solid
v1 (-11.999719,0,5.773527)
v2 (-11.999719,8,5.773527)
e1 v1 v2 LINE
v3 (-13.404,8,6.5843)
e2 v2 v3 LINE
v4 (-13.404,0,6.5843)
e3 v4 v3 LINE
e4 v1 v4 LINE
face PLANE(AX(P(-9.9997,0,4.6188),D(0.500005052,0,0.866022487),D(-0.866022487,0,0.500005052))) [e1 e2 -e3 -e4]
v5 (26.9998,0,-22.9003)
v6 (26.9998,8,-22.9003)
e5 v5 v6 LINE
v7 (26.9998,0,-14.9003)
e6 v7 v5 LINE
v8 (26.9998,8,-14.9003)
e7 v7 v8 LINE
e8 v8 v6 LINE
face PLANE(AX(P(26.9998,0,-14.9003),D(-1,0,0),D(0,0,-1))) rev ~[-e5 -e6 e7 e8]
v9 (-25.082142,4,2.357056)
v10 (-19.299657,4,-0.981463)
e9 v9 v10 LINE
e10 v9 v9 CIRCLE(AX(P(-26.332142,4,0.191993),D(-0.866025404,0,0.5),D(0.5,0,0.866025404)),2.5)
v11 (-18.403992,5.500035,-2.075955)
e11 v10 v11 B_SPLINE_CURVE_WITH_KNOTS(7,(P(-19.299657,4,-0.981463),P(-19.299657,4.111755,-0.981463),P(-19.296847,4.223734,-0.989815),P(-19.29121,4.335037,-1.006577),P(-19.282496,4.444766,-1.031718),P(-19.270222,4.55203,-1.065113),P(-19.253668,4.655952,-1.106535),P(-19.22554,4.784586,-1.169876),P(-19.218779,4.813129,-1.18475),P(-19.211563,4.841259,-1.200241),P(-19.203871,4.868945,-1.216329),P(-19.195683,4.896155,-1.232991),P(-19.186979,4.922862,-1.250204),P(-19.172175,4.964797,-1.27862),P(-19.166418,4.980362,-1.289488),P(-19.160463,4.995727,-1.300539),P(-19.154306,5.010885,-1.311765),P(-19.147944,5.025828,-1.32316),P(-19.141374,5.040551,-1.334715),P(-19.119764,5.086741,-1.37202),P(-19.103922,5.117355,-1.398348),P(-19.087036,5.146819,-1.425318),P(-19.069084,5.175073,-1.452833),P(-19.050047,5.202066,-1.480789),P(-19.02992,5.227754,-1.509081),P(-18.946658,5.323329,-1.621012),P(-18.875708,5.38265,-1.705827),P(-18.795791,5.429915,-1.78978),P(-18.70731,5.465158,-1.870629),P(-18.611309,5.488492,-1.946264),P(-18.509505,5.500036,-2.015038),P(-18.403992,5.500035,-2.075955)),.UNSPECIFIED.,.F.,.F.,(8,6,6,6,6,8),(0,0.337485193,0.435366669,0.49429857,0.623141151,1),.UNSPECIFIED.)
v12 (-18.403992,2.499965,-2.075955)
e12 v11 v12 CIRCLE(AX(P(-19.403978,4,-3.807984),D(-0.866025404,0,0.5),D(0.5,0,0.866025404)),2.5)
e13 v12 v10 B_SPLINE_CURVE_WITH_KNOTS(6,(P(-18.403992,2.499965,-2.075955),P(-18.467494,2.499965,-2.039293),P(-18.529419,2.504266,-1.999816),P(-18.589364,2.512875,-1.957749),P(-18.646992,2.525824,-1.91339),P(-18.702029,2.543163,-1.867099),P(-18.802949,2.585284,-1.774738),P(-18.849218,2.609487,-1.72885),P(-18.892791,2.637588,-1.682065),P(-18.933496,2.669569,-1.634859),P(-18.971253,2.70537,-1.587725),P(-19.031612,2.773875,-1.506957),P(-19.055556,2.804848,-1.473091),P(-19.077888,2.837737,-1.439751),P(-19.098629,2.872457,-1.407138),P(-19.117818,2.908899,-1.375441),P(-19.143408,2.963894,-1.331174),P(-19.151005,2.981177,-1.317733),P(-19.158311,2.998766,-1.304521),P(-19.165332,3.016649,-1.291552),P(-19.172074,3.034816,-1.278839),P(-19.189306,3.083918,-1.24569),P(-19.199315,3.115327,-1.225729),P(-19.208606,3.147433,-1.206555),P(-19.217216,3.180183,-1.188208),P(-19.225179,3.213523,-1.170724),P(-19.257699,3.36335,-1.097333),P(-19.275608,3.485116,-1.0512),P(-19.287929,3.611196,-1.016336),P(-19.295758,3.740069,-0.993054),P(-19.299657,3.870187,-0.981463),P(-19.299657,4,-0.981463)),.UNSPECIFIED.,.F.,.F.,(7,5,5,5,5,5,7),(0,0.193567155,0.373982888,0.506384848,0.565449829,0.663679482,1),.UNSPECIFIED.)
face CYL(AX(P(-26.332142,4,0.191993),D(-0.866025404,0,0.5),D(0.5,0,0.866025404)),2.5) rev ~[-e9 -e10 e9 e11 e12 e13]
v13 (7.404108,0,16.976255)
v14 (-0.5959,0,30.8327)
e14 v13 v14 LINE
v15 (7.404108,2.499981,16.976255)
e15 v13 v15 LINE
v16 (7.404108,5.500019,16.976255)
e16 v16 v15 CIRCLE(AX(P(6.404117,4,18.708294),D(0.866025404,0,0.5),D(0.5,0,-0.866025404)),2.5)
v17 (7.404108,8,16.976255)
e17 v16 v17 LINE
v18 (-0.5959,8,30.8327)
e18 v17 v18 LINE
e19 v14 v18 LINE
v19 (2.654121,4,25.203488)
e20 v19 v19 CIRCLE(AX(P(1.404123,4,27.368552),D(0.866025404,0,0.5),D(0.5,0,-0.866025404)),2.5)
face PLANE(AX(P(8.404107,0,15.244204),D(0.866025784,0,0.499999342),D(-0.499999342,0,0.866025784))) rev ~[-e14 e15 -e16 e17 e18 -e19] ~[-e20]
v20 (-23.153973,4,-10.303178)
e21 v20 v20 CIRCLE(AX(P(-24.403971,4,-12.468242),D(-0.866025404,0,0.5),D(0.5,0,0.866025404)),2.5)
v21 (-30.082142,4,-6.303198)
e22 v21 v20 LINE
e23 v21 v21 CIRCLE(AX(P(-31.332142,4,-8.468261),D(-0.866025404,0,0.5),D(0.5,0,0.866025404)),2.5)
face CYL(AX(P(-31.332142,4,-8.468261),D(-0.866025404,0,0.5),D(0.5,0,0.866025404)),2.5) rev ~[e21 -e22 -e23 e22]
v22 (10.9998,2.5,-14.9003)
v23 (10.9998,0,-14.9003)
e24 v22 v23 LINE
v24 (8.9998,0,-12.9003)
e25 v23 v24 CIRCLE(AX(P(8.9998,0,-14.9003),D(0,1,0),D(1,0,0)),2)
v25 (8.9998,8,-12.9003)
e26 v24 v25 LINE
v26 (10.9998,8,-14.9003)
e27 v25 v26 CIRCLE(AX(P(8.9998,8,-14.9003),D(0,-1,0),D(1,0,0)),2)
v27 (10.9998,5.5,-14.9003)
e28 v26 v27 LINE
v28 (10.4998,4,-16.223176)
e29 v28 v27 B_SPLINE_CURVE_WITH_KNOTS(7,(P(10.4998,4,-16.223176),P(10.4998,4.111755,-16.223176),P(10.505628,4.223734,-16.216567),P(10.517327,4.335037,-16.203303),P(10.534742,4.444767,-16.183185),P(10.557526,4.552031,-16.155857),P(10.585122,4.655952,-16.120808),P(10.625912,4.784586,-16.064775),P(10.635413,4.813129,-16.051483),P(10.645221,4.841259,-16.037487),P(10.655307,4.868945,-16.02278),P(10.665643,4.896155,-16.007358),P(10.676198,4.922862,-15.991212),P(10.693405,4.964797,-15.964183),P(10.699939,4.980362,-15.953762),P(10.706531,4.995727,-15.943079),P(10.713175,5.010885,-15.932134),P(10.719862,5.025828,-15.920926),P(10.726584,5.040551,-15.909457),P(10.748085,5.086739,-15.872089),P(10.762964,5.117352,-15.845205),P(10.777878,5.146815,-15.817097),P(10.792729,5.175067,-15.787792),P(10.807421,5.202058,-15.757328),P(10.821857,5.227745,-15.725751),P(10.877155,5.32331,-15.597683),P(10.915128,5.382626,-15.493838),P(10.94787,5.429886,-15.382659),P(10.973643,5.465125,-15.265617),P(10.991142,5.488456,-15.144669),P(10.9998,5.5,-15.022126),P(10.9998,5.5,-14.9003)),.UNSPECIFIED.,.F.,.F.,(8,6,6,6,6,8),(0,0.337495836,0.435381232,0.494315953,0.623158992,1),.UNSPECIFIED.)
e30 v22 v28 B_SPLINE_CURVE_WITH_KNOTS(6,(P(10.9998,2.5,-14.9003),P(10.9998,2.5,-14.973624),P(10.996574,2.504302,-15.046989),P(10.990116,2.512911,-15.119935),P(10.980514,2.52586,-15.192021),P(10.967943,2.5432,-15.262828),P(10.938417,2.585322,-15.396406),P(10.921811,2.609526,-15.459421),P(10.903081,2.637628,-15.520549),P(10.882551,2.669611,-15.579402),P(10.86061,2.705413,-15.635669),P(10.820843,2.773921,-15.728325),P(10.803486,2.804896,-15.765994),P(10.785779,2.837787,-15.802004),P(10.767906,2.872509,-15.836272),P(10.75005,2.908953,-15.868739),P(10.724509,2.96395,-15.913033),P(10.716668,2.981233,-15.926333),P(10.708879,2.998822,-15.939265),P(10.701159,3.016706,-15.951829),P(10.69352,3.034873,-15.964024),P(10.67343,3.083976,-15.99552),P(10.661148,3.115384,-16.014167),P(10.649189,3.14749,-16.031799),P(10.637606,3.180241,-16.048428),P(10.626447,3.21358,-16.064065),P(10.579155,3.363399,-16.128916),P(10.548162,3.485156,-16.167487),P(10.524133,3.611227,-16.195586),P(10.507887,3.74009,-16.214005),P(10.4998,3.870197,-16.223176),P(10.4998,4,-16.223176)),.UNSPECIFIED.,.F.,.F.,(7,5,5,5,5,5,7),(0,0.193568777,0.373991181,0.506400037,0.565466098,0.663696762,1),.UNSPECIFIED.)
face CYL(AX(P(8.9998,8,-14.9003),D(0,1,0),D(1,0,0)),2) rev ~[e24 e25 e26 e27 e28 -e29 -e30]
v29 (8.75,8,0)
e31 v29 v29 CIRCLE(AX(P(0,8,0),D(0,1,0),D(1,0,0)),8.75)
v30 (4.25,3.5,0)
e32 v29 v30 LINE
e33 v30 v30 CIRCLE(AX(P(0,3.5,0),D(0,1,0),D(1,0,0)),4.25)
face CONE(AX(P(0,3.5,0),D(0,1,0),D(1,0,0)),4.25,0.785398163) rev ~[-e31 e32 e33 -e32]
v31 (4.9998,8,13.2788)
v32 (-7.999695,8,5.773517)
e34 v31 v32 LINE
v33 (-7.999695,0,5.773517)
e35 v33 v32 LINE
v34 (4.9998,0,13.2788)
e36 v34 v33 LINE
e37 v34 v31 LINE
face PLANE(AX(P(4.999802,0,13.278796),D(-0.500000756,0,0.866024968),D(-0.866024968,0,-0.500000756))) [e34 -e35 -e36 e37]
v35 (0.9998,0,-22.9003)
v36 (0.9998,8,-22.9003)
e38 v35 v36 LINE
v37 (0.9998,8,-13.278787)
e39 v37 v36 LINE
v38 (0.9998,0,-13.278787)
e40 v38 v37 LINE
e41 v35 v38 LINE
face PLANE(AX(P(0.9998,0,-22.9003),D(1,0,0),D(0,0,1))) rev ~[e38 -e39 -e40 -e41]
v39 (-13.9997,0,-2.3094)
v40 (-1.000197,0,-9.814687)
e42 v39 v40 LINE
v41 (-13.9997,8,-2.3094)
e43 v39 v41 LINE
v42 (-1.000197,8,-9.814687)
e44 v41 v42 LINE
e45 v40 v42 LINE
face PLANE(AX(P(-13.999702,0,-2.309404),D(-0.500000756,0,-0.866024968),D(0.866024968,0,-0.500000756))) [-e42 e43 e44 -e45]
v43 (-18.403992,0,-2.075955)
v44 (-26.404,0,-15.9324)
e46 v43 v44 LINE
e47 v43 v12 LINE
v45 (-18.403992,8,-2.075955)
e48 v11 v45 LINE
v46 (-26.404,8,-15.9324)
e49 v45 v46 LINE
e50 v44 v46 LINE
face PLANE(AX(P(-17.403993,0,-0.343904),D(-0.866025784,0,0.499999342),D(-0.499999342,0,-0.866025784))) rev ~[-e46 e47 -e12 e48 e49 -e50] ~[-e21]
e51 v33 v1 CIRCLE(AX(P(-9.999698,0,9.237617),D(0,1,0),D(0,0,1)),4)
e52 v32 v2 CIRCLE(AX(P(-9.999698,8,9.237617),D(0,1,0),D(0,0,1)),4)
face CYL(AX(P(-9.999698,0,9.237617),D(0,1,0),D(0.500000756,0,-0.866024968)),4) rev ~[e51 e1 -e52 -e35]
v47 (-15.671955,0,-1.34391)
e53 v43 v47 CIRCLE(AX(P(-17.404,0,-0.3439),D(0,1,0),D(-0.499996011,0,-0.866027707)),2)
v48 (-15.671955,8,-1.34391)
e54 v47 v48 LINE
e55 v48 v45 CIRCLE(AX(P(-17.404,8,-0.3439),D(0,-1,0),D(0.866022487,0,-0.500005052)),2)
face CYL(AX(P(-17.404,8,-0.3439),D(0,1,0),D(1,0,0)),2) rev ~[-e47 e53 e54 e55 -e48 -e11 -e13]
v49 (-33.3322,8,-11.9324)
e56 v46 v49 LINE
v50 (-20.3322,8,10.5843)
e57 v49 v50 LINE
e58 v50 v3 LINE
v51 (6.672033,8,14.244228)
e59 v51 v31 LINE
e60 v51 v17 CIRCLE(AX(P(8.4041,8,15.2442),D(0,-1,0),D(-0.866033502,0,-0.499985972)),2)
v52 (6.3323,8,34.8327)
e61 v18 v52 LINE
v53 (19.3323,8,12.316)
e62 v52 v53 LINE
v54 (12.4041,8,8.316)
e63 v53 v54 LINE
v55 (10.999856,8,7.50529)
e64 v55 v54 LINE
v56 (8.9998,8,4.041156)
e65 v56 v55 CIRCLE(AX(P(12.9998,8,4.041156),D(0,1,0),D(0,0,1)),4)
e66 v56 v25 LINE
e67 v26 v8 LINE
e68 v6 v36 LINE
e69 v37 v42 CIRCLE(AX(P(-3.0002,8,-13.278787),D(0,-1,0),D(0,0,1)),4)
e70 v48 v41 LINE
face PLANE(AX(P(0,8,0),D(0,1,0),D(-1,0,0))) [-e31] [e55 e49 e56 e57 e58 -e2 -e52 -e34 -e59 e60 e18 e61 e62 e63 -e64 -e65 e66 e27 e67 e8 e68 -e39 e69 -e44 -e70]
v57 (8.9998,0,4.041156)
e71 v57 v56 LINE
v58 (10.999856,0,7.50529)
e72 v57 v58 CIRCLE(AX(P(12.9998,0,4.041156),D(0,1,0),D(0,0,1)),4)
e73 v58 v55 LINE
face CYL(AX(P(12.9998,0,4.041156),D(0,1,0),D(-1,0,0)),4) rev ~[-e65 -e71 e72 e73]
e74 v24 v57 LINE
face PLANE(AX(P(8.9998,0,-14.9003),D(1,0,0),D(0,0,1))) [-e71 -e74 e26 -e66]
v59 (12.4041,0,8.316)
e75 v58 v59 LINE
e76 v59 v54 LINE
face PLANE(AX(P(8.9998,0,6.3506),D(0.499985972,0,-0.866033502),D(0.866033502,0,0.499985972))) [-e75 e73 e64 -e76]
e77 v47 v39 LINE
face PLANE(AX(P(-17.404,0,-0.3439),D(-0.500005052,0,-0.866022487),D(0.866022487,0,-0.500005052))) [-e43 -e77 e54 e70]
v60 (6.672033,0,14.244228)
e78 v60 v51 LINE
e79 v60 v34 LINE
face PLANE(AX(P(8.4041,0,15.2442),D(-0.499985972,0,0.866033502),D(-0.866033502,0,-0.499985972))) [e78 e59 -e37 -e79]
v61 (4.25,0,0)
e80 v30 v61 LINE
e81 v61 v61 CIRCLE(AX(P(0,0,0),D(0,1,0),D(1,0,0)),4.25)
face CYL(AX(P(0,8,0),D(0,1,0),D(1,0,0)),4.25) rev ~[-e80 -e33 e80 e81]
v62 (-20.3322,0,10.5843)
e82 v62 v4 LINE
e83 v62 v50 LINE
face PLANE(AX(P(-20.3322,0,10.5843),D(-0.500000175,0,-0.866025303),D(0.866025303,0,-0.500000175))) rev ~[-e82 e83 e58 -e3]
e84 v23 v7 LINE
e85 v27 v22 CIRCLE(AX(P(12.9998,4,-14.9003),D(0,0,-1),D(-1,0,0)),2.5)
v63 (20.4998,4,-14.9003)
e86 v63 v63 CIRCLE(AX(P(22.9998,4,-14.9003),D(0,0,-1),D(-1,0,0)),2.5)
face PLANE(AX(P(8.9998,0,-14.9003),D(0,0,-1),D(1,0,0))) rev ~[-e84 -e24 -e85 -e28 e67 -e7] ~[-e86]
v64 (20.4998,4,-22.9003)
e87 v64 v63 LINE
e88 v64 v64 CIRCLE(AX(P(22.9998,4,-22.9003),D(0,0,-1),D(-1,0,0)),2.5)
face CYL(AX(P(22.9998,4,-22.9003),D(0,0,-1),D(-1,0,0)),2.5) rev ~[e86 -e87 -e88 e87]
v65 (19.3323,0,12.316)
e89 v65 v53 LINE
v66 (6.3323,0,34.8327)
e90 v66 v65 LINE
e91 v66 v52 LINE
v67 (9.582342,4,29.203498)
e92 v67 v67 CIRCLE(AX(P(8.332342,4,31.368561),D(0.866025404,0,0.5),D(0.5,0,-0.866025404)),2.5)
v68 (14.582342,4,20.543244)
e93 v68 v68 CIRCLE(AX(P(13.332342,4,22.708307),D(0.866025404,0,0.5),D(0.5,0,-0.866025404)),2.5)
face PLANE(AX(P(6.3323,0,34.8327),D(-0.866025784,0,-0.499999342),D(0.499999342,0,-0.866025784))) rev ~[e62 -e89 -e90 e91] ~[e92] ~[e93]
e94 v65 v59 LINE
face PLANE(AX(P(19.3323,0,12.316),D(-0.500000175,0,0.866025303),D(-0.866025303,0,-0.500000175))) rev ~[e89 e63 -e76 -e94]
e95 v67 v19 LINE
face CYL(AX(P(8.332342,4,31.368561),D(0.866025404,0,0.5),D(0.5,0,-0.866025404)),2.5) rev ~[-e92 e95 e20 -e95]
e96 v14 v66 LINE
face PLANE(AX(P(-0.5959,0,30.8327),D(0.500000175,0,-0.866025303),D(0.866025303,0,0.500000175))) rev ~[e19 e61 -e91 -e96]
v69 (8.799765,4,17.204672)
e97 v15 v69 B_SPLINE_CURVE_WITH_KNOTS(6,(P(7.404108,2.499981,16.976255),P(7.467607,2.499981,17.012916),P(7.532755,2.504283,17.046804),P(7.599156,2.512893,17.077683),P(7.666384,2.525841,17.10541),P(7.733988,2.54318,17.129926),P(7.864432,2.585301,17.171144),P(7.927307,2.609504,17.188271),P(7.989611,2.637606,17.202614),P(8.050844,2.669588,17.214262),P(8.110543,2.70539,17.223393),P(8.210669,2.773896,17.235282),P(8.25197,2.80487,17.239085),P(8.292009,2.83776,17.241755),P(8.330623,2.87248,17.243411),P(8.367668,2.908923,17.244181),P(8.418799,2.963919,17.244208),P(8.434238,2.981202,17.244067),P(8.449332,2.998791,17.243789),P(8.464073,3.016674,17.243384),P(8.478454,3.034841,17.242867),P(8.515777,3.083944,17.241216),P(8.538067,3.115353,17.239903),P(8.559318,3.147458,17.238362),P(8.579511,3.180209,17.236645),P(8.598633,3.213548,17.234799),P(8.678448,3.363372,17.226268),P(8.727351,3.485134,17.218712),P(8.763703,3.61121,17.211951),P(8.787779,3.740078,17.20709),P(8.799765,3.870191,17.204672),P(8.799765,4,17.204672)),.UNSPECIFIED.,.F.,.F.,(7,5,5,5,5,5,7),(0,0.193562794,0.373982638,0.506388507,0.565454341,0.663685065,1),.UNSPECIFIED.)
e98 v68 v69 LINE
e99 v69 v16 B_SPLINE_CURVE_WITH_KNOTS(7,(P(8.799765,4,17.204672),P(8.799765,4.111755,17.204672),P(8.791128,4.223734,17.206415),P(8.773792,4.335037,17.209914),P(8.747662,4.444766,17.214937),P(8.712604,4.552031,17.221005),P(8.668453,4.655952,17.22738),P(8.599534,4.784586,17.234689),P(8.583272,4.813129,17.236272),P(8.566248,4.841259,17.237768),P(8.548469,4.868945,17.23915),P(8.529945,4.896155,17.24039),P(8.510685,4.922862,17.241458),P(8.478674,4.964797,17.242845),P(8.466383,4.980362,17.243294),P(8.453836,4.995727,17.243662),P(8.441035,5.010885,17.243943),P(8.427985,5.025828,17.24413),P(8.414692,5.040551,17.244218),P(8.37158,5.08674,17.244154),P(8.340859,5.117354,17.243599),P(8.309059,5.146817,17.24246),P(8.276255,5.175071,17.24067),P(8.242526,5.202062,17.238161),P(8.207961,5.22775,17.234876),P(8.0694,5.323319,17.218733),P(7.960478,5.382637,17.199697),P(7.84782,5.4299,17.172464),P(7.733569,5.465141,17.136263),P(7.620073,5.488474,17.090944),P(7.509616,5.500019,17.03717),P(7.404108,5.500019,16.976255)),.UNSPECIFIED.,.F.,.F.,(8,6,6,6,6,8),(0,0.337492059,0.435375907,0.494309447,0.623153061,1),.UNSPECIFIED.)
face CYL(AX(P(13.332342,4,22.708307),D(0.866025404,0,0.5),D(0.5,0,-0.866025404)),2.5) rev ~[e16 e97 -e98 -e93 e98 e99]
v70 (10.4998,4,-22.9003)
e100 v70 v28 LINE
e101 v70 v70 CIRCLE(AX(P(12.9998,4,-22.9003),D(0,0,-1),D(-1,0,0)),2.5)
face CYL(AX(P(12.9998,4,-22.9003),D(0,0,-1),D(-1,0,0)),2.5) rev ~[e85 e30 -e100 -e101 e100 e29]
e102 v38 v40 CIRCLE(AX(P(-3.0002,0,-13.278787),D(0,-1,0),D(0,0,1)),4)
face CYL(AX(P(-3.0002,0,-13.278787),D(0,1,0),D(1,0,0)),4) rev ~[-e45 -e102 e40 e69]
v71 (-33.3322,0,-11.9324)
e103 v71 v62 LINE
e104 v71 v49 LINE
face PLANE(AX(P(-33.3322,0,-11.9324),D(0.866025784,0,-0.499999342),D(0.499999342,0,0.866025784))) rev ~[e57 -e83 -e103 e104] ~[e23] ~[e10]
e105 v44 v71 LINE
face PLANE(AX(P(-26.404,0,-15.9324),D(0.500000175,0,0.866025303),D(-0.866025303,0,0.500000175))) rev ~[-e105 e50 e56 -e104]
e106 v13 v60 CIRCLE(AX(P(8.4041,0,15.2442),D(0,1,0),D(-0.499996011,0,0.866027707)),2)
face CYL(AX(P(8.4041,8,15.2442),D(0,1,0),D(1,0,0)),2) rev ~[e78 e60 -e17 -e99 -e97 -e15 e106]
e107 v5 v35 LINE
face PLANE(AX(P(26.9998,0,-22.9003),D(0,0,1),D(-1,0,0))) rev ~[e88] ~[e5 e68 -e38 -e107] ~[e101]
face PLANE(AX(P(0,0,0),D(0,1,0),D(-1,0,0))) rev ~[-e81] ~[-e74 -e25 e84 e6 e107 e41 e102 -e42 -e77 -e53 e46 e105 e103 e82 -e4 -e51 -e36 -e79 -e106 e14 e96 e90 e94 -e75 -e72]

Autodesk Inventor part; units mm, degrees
ref_plane "YZ Plane" through (0, 0, 0) normal (1, 0, 0) x (0, 1, 0)
ref_plane "XZ Plane" through (0, 0, 0) normal (0, 1, 0) x (-1, 0, 0)
ref_plane "XY Plane" through (0, 0, 0) normal (0, 0, 1) x (1, 0, 0)
sketch "Sketch1" plane through (0, 0, 0) normal (0, 1, 0) x (-1, 0, 0)
  line L0 (-0.9998, -14.9003) -> (-26.9998, -14.9003)
  line L1 (-26.9998, -14.9003) -> (-26.9998, -22.9003)
  line L2 (-26.9998, -22.9003) -> (-0.9998, -22.9003)
  line L3 (-0.9998, -22.9003) -> (-0.9998, -14.9003)
  line L4 (-0.9998, -14.9003) -> (-8.9998, -14.9003)
  line L5 (-8.9998, -14.9003) -> (-8.9998, -10.9694)
  line L6 (-8.9998, -10.9694) -> (-0.9998, -10.9694) construction
  line L7 (-0.9998, -10.9694) -> (-0.9998, -14.9003)
  line L8 (13.404, 6.5843) -> (26.404, -15.9324)
  line L9 (26.404, -15.9324) -> (33.3322, -11.9324)
  line L10 (33.3322, -11.9324) -> (20.3322, 10.5843)
  line L11 (20.3322, 10.5843) -> (13.404, 6.5843)
  line L12 (13.404, 6.5843) -> (17.404, -0.3439)
  line L13 (17.404, -0.3439) -> (13.9997, -2.3094)
  line L14 (13.9997, -2.3094) -> (9.9997, 4.6188) construction
  line L15 (9.9997, 4.6188) -> (13.404, 6.5843)
  line L16 (-12.4041, 8.316) -> (0.5959, 30.8327)
  line L17 (0.5959, 30.8327) -> (-6.3323, 34.8327)
  line L18 (-6.3323, 34.8327) -> (-19.3323, 12.316)
  line L19 (-19.3323, 12.316) -> (-12.4041, 8.316)
  line L20 (-12.4041, 8.316) -> (-8.4041, 15.2442)
  line L21 (-8.4041, 15.2442) -> (-4.9998, 13.2788)
  line L22 (-4.9998, 13.2788) -> (-8.9998, 6.3506) construction
  line L23 (-8.9998, 6.3506) -> (-12.4041, 8.316)
  line L24 (17.9997, 0) -> (-8.9998, -15.5882)
  line L25 (-8.9998, -15.5882) -> (-8.9998, 15.5882)
  line L26 (-8.9998, 15.5882) -> (17.9997, 0)
  point P0 (0, 0)
  point P1 (0, 0)
  point P2 (17.404, -0.3439)
  dimension "d0" = 8
  dimension "d3" = 360
  dimension "d5" = 60.332
  dimension "d6" = 57.733
  dimension "d7" = 26
extrude "Extrusion1" add sketch "Sketch1" along normal blind 8
fillet "Fillet1" radius 4 3 edges at (8.9998, 4, 6.3506) (-9.9997, 4, 4.6188) (0.9998, 4, -10.9694)
sketch "Sketch2" plane through (0, 8, 0) normal (0, 1, 0) x (1, 0, 0)
  line L0 (8.9998, -4.0412) -> (8.9998, 14.9003) projected
  circle A0 centre (8.9998, 14.9003) radius 2
  line L1 (8.4041, -15.2442) -> (-0.5959, -30.8327) projected
  circle A1 centre (8.4041, -15.2442) radius 2
  line L2 (-1.0002, 9.8147) -> (-17.404, 0.3439) projected
  circle A2 centre (-17.404, 0.3439) radius 2
  circle A3 centre (0, 0) radius 4.25
  dimension "d11" = 4
  dimension "d14" = 8.5
extrude "Extrusion2" cut sketch "Sketch2" against normal blind 18.75
chamfer "Chamfer1" distance 4.5 angle 45 1 edges at (-4.25, 8, 0)
sketch "Sketch3" plane through (26.9998, 0, -22.9003) normal (0, 0, -1) x (-1, 0, 0)
  circle A0 centre (4, 4) radius 2.5
  circle A1 centre (14, 4) radius 2.5
  line L0 (0, 0) -> (26, 0) projected
  line L1 (0, 0) -> (0, 8) projected
  point P0 (26.9998, 0)
  dimension "d18" = 10
  dimension "d19" = 5
  dimension "d20" = 4
  dimension "d21" = 4
extrude "Extrusion3" cut sketch "Sketch3" against normal blind 18.75
thread "Thread1" size "M5x0.8" class "6H" standard "ISO Metric profile" length 15
thread "Thread2" size "M5x0.8" class "6H" standard "ISO Metric profile" length 15
pattern_circular "Circular Pattern1" count 3 over 360 about axis through (0, 8, 0) along (0, -1, 0) of "Extrusion3"
thread "Thread3" size "M5x0.8" class "6H" standard "ISO Metric profile" length 15
thread "Thread4" size "M5x0.8" class "6H" standard "ANSI Metric M Profile" length 15
thread "Thread5" size "M5x0.8" class "6H" standard "ISO Metric profile" length 15
thread "Thread6" size "M5x0.8" class "6H" standard "ANSI Metric M Profile" length 15
properties part number "ServoCap" material "Steel, Carbon"
